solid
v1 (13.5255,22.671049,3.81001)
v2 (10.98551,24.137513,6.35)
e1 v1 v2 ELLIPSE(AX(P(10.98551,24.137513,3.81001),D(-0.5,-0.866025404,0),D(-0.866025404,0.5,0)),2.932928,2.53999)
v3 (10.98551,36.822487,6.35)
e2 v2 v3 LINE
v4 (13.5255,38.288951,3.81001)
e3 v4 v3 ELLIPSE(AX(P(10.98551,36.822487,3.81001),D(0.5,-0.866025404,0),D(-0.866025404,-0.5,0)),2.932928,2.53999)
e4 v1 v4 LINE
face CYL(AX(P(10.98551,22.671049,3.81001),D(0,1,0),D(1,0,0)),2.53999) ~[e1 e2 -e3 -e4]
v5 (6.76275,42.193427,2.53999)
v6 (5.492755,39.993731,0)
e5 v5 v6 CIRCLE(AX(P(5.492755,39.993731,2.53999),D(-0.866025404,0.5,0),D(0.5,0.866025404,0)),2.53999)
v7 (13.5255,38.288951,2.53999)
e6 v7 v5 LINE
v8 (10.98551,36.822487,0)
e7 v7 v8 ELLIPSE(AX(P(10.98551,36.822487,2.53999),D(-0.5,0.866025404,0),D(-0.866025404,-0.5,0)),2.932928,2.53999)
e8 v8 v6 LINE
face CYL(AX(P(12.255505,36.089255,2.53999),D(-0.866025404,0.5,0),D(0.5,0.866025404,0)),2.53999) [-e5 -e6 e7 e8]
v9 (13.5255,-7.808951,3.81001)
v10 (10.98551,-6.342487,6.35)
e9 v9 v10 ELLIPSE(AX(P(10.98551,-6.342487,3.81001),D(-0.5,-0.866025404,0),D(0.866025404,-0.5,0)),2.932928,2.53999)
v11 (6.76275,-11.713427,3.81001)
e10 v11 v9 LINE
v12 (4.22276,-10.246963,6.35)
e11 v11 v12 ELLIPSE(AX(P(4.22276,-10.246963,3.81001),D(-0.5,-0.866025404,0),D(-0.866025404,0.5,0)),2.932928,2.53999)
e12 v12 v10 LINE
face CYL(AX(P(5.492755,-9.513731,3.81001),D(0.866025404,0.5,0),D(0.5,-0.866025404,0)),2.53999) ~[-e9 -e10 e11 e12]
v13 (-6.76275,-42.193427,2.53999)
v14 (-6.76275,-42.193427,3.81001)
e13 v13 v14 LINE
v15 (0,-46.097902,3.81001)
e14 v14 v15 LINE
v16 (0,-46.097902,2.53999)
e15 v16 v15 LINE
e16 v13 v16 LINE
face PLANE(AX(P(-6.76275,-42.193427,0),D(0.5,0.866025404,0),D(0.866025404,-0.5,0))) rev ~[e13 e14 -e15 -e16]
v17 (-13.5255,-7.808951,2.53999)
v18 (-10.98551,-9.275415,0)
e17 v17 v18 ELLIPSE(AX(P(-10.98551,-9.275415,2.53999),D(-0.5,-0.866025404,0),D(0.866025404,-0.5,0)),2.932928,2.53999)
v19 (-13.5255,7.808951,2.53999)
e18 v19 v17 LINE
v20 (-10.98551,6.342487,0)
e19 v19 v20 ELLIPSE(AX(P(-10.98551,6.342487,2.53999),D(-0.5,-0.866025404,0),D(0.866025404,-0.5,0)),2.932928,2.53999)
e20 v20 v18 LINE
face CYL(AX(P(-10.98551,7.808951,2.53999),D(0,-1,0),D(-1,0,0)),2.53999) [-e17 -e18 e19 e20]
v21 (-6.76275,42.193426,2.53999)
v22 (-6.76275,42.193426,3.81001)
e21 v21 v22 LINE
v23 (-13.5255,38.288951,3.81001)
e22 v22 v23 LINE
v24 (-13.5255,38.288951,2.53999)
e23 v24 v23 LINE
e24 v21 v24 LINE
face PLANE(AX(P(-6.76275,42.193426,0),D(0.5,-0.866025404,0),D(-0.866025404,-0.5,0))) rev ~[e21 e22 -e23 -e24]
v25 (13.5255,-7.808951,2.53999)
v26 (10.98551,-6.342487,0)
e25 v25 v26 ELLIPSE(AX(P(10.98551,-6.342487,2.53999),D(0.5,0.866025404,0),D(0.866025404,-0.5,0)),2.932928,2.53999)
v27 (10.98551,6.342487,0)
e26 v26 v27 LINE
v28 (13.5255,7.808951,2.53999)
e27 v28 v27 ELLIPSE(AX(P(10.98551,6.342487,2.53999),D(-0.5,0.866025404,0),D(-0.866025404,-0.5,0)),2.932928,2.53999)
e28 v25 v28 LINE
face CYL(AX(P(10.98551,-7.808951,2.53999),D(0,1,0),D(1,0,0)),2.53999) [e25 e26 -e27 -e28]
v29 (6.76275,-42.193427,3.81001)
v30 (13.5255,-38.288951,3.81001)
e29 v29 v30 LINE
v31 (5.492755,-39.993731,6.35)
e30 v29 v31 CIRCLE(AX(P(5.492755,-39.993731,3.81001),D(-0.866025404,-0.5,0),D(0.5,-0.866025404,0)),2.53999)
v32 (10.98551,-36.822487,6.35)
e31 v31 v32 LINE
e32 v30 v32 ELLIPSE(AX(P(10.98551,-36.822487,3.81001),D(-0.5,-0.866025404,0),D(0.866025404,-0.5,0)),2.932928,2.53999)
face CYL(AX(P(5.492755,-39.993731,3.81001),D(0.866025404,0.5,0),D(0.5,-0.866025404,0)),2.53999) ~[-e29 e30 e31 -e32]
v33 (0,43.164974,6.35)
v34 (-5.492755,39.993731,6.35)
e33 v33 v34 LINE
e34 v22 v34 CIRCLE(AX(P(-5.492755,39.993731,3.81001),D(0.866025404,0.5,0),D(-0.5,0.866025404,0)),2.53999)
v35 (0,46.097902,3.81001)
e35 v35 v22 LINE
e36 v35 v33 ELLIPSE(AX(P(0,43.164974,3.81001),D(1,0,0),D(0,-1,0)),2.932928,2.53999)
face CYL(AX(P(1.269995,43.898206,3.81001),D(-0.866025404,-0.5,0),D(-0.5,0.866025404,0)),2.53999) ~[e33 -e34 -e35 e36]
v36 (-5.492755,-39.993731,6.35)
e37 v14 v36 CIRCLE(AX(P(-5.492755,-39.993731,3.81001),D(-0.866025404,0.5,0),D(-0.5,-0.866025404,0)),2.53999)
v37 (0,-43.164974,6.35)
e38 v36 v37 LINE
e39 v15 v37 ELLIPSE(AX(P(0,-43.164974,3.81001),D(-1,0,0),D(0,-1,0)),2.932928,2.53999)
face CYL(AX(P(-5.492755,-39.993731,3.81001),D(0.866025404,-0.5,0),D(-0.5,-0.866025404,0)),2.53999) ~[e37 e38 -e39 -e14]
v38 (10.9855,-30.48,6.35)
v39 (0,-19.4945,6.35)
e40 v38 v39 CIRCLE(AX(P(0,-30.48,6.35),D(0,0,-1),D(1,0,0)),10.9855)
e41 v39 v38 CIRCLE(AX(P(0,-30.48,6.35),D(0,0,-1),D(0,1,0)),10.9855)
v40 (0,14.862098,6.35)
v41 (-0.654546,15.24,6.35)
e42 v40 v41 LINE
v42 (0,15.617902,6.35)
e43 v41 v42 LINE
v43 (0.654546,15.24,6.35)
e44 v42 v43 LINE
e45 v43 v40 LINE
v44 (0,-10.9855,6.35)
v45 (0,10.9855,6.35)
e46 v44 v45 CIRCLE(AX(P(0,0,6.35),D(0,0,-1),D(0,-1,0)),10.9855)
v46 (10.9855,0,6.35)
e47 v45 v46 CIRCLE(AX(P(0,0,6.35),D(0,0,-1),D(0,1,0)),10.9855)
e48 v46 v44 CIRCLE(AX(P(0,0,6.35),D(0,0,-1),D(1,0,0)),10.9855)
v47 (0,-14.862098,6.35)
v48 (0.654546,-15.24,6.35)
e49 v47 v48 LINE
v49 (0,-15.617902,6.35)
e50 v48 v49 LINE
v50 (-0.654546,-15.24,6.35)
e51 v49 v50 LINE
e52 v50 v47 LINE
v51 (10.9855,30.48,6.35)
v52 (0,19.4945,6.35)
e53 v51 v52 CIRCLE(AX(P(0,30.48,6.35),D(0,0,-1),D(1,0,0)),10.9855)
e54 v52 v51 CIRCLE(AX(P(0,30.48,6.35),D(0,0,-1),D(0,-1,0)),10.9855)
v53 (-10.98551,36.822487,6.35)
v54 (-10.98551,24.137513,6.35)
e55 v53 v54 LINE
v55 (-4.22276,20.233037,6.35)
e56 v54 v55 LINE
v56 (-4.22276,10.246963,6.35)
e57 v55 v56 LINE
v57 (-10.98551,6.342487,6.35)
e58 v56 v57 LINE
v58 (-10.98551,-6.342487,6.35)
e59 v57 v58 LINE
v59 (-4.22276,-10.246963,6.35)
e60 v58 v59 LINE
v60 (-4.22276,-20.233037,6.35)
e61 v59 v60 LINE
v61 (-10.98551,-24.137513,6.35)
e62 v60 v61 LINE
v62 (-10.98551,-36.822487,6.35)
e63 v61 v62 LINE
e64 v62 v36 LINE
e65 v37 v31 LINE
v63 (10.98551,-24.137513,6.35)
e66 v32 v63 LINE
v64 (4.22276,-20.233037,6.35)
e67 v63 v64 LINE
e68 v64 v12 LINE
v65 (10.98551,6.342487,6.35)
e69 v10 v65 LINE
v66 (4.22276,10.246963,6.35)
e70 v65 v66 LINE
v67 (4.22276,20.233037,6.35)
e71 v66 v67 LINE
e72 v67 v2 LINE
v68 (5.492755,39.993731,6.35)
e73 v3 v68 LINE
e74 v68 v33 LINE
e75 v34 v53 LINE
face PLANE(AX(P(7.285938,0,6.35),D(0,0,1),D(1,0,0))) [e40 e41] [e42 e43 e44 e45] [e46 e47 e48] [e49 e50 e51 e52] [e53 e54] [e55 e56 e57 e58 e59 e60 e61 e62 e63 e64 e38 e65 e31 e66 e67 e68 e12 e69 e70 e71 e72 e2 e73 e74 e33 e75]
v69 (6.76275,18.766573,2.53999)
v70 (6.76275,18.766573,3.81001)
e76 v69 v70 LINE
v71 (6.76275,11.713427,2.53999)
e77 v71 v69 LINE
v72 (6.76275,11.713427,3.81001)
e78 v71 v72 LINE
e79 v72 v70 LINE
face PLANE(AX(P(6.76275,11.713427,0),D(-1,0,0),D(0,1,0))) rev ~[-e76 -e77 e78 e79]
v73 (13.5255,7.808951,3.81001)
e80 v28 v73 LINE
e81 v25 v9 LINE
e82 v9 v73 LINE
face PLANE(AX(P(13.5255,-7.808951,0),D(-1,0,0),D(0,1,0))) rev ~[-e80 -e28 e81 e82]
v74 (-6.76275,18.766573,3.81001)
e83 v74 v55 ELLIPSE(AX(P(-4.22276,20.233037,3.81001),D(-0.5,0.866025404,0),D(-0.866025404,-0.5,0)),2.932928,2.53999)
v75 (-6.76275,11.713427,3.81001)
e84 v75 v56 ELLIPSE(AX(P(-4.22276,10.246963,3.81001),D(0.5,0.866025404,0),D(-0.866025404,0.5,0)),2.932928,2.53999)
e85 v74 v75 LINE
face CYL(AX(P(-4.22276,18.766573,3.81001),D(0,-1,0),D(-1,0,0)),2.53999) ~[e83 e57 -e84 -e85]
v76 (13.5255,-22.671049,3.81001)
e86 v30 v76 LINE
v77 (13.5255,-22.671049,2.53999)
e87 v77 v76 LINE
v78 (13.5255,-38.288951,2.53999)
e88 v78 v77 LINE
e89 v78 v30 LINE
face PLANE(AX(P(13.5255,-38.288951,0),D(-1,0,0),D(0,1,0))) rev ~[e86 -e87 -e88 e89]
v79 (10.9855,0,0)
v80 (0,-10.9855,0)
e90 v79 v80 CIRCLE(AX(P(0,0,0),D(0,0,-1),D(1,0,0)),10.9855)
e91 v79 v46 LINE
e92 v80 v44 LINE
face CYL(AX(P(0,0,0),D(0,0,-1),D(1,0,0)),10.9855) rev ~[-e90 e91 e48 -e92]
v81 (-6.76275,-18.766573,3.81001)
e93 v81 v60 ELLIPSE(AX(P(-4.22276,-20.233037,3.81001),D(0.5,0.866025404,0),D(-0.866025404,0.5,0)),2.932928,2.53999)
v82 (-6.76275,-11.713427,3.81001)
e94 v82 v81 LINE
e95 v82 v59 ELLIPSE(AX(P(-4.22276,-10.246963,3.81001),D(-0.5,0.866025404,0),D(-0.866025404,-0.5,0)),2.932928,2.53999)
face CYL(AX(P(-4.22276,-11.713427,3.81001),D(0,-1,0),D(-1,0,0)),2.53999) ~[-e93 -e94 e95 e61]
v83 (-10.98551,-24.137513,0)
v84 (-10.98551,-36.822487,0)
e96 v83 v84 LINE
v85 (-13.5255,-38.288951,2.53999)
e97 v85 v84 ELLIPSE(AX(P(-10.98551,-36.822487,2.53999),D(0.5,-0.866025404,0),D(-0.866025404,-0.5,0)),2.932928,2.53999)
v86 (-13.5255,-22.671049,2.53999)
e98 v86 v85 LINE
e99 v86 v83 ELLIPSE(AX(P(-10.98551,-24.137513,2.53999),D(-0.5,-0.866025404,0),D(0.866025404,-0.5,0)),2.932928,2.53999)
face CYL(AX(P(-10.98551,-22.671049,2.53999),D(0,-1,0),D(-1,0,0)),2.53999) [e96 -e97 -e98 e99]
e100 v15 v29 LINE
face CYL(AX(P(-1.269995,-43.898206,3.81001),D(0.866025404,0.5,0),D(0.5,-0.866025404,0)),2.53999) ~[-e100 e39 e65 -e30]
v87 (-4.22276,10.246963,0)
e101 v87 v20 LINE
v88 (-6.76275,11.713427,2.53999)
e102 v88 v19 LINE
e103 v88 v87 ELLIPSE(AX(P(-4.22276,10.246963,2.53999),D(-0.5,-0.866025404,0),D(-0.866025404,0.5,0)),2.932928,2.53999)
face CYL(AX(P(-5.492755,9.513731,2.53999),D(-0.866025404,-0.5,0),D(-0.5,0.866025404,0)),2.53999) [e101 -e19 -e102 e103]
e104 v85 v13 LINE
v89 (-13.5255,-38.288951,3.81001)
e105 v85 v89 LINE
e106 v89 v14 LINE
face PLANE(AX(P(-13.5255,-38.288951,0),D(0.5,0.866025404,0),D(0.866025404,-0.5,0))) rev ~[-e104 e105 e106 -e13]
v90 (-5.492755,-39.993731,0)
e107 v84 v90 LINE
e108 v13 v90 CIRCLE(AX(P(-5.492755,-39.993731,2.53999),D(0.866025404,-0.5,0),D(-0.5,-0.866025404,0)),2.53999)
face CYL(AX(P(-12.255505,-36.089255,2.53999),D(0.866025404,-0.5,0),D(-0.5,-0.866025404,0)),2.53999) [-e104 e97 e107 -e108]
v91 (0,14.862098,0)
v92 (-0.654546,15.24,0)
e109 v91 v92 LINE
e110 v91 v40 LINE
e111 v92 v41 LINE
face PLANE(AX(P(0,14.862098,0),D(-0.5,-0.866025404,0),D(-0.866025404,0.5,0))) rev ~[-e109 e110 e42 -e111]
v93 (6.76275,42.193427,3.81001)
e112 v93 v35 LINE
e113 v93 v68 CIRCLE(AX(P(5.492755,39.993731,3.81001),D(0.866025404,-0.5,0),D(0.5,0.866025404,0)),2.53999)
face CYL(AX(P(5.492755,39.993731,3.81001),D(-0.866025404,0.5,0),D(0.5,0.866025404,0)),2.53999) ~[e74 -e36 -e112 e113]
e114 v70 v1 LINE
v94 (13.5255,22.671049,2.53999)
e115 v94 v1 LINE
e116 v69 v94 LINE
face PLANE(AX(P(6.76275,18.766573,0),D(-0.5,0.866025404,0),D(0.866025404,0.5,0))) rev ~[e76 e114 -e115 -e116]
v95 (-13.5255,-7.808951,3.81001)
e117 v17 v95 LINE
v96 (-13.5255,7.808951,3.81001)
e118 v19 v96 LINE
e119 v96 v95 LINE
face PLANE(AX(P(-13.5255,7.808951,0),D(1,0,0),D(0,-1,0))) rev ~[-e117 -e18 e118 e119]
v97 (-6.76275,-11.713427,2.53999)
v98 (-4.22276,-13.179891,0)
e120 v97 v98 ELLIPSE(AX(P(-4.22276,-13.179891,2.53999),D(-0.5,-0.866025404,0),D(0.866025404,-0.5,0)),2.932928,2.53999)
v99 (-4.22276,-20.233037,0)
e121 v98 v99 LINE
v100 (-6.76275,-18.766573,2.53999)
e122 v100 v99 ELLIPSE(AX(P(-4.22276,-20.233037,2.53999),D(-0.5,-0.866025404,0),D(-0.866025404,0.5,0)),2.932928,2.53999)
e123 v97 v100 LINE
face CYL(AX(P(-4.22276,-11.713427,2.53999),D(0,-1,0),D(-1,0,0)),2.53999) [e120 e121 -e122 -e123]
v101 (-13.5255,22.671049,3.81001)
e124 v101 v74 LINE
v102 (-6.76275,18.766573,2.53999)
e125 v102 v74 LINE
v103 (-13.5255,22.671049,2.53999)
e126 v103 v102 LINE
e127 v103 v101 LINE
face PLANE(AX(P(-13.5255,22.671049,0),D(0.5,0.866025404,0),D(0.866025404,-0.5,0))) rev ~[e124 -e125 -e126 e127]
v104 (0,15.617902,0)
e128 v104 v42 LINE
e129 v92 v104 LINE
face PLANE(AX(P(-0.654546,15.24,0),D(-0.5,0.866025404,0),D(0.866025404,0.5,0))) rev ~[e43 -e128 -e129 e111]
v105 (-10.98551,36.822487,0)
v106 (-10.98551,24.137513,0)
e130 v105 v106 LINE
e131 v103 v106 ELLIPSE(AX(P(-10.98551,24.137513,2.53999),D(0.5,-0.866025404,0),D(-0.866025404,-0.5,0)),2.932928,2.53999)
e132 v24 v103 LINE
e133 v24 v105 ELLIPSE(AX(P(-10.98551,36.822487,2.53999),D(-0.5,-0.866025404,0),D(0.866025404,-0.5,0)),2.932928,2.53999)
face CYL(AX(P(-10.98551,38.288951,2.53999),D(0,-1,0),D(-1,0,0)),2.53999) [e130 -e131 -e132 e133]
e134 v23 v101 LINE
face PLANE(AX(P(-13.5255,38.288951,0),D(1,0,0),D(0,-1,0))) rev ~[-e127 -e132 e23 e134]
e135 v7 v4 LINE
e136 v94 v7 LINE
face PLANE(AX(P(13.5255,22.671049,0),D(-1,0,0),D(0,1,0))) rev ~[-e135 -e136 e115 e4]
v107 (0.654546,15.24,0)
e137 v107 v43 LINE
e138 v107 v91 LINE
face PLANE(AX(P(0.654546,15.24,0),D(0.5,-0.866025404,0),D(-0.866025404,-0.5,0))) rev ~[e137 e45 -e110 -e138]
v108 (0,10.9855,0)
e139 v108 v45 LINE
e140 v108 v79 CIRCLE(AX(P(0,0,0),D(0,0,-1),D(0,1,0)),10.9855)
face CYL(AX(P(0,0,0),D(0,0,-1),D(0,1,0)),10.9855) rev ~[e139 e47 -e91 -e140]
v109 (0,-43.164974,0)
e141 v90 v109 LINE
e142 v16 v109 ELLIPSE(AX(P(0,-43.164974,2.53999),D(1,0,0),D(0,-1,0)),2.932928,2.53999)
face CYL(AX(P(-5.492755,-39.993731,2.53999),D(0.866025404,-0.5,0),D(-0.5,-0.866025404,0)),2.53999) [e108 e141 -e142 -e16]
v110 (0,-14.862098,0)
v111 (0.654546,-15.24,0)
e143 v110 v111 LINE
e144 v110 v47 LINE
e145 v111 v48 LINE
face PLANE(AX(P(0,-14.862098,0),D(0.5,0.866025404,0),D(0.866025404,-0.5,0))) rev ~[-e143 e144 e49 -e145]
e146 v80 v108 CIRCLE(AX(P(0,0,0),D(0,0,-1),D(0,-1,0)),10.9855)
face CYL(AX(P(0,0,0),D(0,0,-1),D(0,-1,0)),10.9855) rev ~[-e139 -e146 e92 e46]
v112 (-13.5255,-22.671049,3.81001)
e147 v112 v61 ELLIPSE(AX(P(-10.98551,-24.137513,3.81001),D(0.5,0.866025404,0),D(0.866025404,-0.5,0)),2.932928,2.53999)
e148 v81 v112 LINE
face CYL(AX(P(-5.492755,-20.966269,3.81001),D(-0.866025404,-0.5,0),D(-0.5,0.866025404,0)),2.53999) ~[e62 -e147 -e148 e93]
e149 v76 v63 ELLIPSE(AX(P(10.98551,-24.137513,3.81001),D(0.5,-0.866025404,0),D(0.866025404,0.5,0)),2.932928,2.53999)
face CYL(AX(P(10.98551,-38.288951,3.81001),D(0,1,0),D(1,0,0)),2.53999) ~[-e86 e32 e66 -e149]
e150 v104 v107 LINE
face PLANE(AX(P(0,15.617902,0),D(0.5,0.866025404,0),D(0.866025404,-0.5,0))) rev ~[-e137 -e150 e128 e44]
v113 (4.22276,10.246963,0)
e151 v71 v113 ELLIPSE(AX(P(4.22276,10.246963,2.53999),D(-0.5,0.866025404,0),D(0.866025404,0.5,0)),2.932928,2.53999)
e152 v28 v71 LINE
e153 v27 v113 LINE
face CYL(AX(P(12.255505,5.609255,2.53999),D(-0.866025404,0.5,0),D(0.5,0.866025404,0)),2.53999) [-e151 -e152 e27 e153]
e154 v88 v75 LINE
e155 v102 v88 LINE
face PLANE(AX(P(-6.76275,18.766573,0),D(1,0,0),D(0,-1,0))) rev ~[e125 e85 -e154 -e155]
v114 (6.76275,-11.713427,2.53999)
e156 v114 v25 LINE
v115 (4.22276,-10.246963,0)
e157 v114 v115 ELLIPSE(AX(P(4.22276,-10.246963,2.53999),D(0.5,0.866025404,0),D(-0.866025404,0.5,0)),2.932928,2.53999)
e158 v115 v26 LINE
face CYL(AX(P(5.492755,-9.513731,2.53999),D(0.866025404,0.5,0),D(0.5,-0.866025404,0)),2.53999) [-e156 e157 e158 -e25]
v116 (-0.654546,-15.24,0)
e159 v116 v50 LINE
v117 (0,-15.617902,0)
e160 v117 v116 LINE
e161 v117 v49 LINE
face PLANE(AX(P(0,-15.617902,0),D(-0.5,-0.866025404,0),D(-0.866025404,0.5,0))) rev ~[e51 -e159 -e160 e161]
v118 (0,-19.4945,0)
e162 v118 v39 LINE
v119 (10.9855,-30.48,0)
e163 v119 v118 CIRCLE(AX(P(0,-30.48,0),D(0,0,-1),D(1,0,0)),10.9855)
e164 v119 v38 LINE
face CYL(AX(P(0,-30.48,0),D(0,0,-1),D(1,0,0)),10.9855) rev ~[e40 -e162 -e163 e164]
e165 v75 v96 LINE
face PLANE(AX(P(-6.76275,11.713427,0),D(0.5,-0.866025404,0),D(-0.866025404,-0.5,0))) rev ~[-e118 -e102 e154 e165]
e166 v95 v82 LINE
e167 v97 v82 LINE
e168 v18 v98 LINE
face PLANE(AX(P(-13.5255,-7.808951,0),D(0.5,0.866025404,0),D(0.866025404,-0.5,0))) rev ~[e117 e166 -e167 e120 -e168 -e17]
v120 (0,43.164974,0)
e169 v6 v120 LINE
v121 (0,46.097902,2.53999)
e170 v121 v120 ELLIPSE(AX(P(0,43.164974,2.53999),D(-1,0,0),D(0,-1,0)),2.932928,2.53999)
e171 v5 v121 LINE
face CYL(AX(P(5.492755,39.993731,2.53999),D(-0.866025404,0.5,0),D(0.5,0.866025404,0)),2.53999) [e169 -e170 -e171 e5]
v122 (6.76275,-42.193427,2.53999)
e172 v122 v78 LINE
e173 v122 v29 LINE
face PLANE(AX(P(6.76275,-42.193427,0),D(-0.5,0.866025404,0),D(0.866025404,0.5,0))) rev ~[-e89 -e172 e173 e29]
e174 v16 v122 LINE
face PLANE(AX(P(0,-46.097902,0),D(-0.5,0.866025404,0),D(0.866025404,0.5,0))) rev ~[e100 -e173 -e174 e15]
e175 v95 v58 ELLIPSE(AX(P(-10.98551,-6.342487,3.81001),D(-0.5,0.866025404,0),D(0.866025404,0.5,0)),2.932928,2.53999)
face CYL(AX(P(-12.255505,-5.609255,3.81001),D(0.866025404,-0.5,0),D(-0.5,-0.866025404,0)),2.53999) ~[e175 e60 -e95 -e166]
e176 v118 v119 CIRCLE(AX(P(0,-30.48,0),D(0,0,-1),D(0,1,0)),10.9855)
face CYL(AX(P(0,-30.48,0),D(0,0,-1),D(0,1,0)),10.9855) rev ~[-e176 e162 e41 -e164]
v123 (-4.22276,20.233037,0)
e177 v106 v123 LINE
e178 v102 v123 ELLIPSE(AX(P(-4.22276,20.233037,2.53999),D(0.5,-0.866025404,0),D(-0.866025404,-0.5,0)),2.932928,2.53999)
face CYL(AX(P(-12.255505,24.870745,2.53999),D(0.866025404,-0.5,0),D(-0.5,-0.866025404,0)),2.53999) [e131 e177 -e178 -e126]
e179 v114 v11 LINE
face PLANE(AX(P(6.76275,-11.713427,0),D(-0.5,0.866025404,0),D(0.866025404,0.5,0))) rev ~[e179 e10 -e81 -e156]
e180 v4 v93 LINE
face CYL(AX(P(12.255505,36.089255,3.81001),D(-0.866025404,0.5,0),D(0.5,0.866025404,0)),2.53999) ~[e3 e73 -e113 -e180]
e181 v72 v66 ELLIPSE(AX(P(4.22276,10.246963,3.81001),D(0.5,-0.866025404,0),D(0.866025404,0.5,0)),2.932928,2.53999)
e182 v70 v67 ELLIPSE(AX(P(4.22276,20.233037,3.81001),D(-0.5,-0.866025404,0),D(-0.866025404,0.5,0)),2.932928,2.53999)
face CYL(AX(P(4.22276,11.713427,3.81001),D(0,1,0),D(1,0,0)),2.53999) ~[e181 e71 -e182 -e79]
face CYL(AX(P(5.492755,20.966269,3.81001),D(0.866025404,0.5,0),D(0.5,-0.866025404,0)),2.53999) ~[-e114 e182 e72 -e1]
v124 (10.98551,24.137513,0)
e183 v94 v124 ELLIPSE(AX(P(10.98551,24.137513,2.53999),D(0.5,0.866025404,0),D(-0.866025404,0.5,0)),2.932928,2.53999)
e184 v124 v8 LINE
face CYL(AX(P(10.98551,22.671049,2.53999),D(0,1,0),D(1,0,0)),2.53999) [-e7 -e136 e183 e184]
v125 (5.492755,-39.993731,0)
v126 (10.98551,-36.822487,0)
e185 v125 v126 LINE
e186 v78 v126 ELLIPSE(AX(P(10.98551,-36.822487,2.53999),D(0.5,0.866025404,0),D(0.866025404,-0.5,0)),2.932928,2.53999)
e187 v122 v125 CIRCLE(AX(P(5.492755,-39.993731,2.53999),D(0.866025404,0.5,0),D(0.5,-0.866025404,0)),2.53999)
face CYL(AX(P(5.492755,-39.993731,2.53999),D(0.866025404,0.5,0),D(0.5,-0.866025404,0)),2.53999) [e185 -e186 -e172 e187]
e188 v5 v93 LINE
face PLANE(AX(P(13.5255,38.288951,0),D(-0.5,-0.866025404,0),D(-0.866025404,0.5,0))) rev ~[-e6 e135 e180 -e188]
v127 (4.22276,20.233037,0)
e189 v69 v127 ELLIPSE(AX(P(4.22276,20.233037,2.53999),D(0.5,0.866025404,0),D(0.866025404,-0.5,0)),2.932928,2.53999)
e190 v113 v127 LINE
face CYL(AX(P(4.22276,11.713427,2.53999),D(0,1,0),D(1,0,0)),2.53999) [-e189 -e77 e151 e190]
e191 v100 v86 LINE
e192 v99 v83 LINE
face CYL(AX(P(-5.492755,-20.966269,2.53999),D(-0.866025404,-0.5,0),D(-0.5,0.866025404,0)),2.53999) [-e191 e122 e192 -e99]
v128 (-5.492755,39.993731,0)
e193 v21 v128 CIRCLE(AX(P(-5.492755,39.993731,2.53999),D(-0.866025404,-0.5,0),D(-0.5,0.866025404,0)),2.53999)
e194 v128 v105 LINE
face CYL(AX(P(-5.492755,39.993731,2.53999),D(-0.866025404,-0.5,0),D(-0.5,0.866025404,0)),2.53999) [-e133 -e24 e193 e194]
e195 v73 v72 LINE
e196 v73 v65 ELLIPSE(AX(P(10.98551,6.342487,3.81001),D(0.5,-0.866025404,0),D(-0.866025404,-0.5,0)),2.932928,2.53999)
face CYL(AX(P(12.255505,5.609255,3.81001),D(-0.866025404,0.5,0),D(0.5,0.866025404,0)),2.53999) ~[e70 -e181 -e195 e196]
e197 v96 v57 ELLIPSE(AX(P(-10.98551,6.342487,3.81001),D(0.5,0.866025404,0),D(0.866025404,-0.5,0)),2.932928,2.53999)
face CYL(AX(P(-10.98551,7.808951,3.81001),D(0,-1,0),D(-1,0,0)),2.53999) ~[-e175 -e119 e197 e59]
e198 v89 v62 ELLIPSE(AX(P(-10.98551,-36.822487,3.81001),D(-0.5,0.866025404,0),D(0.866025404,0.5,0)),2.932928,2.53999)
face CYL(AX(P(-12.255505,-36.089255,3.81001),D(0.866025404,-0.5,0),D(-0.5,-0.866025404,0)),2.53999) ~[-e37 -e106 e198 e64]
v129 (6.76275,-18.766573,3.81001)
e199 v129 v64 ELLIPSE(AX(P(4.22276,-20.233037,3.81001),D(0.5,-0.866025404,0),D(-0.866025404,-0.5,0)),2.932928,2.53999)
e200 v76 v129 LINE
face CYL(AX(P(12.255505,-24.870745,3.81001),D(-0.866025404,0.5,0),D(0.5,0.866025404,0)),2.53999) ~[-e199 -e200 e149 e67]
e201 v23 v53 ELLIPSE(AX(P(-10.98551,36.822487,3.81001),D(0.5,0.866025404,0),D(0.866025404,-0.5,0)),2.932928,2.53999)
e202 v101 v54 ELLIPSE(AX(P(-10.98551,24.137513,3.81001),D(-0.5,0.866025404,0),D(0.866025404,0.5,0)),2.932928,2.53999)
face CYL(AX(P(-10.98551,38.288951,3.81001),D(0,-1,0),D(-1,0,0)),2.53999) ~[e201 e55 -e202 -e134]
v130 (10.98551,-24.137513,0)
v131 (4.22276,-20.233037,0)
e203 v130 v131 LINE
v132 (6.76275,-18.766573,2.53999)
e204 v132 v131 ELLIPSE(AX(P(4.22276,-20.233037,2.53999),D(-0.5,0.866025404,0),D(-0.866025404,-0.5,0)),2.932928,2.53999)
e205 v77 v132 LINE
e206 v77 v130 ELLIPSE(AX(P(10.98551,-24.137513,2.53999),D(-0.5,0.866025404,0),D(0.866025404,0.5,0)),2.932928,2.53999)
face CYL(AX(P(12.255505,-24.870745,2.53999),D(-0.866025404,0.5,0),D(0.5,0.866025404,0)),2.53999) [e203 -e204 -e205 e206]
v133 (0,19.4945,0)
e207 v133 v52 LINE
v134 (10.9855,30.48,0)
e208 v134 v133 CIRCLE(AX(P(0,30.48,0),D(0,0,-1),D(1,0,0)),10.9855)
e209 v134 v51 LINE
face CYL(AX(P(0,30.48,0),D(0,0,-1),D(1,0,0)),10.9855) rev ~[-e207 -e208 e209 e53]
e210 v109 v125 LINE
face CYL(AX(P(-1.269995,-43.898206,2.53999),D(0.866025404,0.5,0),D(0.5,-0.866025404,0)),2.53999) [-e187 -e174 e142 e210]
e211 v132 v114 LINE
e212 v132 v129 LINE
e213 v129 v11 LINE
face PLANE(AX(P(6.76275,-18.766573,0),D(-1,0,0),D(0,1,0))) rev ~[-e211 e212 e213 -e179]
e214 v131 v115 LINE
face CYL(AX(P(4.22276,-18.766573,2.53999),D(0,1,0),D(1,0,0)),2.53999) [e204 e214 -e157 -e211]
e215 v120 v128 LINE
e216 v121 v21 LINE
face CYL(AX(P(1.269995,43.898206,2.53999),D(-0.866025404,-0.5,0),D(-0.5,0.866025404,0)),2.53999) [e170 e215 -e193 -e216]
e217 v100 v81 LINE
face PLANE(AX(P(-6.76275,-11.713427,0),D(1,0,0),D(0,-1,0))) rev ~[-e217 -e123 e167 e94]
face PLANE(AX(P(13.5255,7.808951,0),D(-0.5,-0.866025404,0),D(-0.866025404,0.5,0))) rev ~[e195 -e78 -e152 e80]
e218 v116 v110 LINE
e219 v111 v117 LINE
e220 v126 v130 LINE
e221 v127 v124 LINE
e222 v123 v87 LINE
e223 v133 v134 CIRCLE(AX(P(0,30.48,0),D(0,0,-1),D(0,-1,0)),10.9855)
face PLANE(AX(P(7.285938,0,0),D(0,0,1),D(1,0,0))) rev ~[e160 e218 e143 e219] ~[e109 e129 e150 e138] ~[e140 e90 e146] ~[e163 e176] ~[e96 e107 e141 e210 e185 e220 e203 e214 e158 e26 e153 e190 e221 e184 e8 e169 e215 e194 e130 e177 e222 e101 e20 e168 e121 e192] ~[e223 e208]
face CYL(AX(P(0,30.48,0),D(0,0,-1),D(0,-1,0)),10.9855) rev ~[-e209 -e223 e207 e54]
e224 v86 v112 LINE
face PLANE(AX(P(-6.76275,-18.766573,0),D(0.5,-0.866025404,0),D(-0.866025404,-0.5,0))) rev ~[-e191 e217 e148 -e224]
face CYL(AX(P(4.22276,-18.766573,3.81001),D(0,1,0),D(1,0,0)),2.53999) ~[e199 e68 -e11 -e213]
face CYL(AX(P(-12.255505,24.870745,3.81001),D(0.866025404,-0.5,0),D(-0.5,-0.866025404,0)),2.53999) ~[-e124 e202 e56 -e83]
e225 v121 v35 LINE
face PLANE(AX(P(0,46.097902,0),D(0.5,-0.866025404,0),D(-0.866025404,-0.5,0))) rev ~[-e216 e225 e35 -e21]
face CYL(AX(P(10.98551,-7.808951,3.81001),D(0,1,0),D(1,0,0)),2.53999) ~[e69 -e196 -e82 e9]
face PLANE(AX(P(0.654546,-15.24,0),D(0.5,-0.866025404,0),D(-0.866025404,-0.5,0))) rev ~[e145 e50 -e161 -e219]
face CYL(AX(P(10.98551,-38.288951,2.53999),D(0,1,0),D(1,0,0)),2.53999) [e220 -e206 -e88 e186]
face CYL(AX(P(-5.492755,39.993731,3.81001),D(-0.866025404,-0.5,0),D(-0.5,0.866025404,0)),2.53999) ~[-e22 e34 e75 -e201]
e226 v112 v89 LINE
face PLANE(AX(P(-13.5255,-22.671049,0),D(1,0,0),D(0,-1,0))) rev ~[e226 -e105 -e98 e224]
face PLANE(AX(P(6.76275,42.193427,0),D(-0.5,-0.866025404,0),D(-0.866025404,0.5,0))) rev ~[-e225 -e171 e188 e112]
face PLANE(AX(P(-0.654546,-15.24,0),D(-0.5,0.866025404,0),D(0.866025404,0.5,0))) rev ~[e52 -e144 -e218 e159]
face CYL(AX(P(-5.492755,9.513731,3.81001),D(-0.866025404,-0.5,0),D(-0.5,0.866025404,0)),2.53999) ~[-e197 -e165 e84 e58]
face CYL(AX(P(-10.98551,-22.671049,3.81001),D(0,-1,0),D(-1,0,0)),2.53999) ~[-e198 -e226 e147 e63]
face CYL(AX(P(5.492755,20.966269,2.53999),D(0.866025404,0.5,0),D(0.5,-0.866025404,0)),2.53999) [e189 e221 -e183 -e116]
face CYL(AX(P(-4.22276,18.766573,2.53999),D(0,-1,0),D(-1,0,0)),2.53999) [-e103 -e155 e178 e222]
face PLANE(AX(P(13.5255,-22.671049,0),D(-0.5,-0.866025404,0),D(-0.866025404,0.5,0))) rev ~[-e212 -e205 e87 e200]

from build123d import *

# Parameters (mm, degrees)
F1_DEPTH = 6.35
F2_R     = 2.53999


# Not quite as in the source:
# - a fillet or chamfer is up to 0.001 mm smaller than in the source, because OpenCascade refuses the exact size


with BuildPart() as f1:
    # F0 (on Top) → F1 (new body)
    with BuildSketch(Plane.XY):
        with BuildLine():
            ThreePointArc((6.76275, -11.7134265989), (11.7134265989, -6.76275), (13.5255, 0))
            ThreePointArc((13.5255, 0), (11.7134265989, 6.76275), (6.76275, 11.7134265989))
            ThreePointArc((6.76275, 11.7134265989), (3.5006569945, 13.0646297635), (0, 13.5255))
            Line((0, 13.5255), (0, 10.9855))
            ThreePointArc((0, 10.9855), (7.7679215447, 7.7679215447), (10.9855, 0))
            ThreePointArc((10.9855, 0), (7.7679215447, -7.7679215447), (0, -10.9855))
            Line((0, -10.9855), (0, -13.5255))
            ThreePointArc((0, -13.5255), (3.5006569945, -13.0646297635), (6.76275, -11.7134265989))
        make_face()
        with BuildLine():
            Line((13.5255, -7.8089510659), (13.5255, 0))
            ThreePointArc((13.5255, 0), (11.7134265989, -6.76275), (6.76275, -11.7134265989))
            Line((6.76275, -11.7134265989), (13.5255, -7.8089510659))
        make_face()
        with BuildLine():
            ThreePointArc((6.76275, 11.7134265989), (11.7134265989, 6.76275), (13.5255, 0))
            Line((13.5255, 0), (13.5255, 7.8089510659))
            Line((13.5255, 7.8089510659), (6.76275, 11.7134265989))
        make_face()
        with BuildLine():
            ThreePointArc((0, 13.5255), (3.5006569945, 13.0646297635), (6.76275, 11.7134265989))
            Line((6.76275, 11.7134265989), (0.6545456927, 15.24))
            Line((0.6545456927, 15.24), (0, 14.8620978682))
            Line((0, 14.8620978682), (0, 13.5255))
        make_face()
        Polygon((0.6545456927, 15.24), (6.76275, 11.7134265989), (6.76275, 18.7665734011), align=None)
        with BuildLine():
            Line((0.6545456927, -15.24), (6.76275, -11.7134265989))
            ThreePointArc((6.76275, -11.7134265989), (3.5006569945, -13.0646297635), (0, -13.5255))
            Line((0, -13.5255), (0, -14.8620978682))
            Line((0, -14.8620978682), (0.6545456927, -15.24))
        make_face()
        Polygon((6.76275, -18.7665734011), (6.76275, -11.7134265989), (0.6545456927, -15.24), align=None)
        with BuildLine():
            Line((0, 10.9855), (0, 13.5255))
            ThreePointArc((0, 13.5255), (-3.5006569945, 13.0646297635), (-6.76275, 11.7134265989))
            ThreePointArc((-6.76275, 11.7134265989), (-11.7134265989, 6.76275), (-13.5255, 0))
            ThreePointArc((-13.5255, 0), (-11.7134265989, -6.76275), (-6.76275, -11.7134265989))
            ThreePointArc((-6.76275, -11.7134265989), (-3.5006569945, -13.0646297635), (0, -13.5255))
            Line((0, -13.5255), (0, -10.9855))
            ThreePointArc((0, -10.9855), (-10.9855, 0), (0, 10.9855))
        make_face()
        with BuildLine():
            ThreePointArc((-6.76275, 11.7134265989), (-3.5006569945, 13.0646297635), (0, 13.5255))
            Line((0, 13.5255), (0, 14.8620978682))
            Line((0, 14.8620978682), (-0.6545456927, 15.24))
            Line((-0.6545456927, 15.24), (-6.76275, 11.7134265989))
        make_face()
        with BuildLine():
            Line((0, 15.6179021318), (0.6545456927, 15.24))
            Line((0.6545456927, 15.24), (6.76275, 18.7665734011))
            ThreePointArc((6.76275, 18.7665734011), (3.5006569945, 17.4153702365), (0, 16.9545))
            Line((0, 16.9545), (0, 15.6179021318))
        make_face()
        with BuildLine():
            ThreePointArc((0, 16.9545), (3.5006569945, 17.4153702365), (6.76275, 18.7665734011))
            ThreePointArc((6.76275, 18.7665734011), (11.7134265989, 23.71725), (13.5255, 30.48))
            ThreePointArc((13.5255, 30.48), (11.7134266013, 37.2427499958), (6.7627500083, 42.1934265941))
            ThreePointArc((6.7627500083, 42.1934265941), (-1.056e-07, 44.0055), (-6.7627501912, 42.1934264885))
            ThreePointArc((-6.7627501912, 42.1934264885), (-11.7134266541, 37.2427499044), (-13.5255, 30.48))
            ThreePointArc((-13.5255, 30.48), (-11.7134265989, 23.71725), (-6.76275, 18.7665734011))
            ThreePointArc((-6.76275, 18.7665734011), (-3.5006569945, 17.4153702365), (0, 16.9545))
        make_face()
        with BuildLine():
            ThreePointArc((10.9855, 30.48), (7.7679215447, 22.7120784553), (0, 19.4945))
            ThreePointArc((0, 19.4945), (-7.7679215447, 38.2479215447), (10.9855, 30.48))
        make_face(mode=Mode.SUBTRACT)
        with BuildLine():
            ThreePointArc((13.5255, 30.48), (11.7134265989, 23.71725), (6.76275, 18.7665734011))
            Line((6.76275, 18.7665734011), (13.5255, 22.6710489341))
            Line((13.5255, 22.6710489341), (13.5255, 30.48))
        make_face()
        with BuildLine():
            Line((0, -14.8620978682), (0, -13.5255))
            ThreePointArc((0, -13.5255), (-3.5006569945, -13.0646297635), (-6.76275, -11.7134265989))
            Line((-6.76275, -11.7134265989), (-0.6545456927, -15.24))
            Line((-0.6545456927, -15.24), (0, -14.8620978682))
        make_face()
        with BuildLine():
            Line((6.76275, -18.7665734011), (0.6545456927, -15.24))
            Line((0.6545456927, -15.24), (0, -15.6179021318))
            Line((0, -15.6179021318), (0, -16.9545))
            ThreePointArc((0, -16.9545), (3.5006569945, -17.4153702365), (6.76275, -18.7665734011))
        make_face()
        with BuildLine():
            Line((13.5255, -22.6710489341), (6.76275, -18.7665734011))
            ThreePointArc((6.76275, -18.7665734011), (11.7134265989, -23.71725), (13.5255, -30.48))
            Line((13.5255, -30.48), (13.5255, -22.6710489341))
        make_face()
        with BuildLine():
            ThreePointArc((13.5255, -30.48), (11.7134265989, -23.71725), (6.76275, -18.7665734011))
            ThreePointArc((6.76275, -18.7665734011), (3.5006569945, -17.4153702365), (0, -16.9545))
            ThreePointArc((0, -16.9545), (-3.5006569945, -17.4153702365), (-6.76275, -18.7665734011))
            ThreePointArc((-6.76275, -18.7665734011), (-11.7134265989, -23.71725), (-13.5255, -30.48))
            ThreePointArc((-13.5255, -30.48), (-11.7134266419, -37.2427499255), (-6.762750149, -42.1934265129))
            ThreePointArc((-6.762750149, -42.1934265129), (-1.97e-07, -44.0055), (6.7627498078, -42.1934267099))
            ThreePointArc((6.7627498078, -42.1934267099), (11.7134265434, -37.2427500961), (13.5255, -30.48))
        make_face()
        with BuildLine():
            ThreePointArc((10.9855, -30.48), (-7.7679215447, -38.2479215447), (0, -19.4945))
            ThreePointArc((0, -19.4945), (7.7679215447, -22.7120784553), (10.9855, -30.48))
        make_face(mode=Mode.SUBTRACT)
        with BuildLine():
            ThreePointArc((-13.5255, 0), (-11.7134265989, 6.76275), (-6.76275, 11.7134265989))
            Line((-6.76275, 11.7134265989), (-13.5255, 7.8089510659))
            Line((-13.5255, 7.8089510659), (-13.5255, 0))
        make_face()
        Polygon((-6.76275, 18.7665734011), (-6.76275, 11.7134265989), (-0.6545456927, 15.24), align=None)
        with BuildLine():
            Line((-0.6545456927, 15.24), (0, 15.6179021318))
            Line((0, 15.6179021318), (0, 16.9545))
            ThreePointArc((0, 16.9545), (-3.5006569945, 17.4153702365), (-6.76275, 18.7665734011))
            Line((-6.76275, 18.7665734011), (-0.6545456927, 15.24))
        make_face()
        with BuildLine():
            ThreePointArc((6.7627500083, 42.1934265941), (11.7134266013, 37.2427499958), (13.5255, 30.48))
            Line((13.5255, 30.48), (13.5255, 38.2889510659))
            Line((13.5255, 38.2889510659), (6.7627500083, 42.1934265941))
        make_face()
        with BuildLine():
            Line((-13.5255, -7.8089510659), (-6.76275, -11.7134265989))
            ThreePointArc((-6.76275, -11.7134265989), (-11.7134265989, -6.76275), (-13.5255, 0))
            Line((-13.5255, 0), (-13.5255, -7.8089510659))
        make_face()
        Polygon((-0.6545456927, -15.24), (-6.76275, -11.7134265989), (-6.76275, -18.7665734011), align=None)
        with BuildLine():
            Line((0, -16.9545), (0, -15.6179021318))
            Line((0, -15.6179021318), (-0.6545456927, -15.24))
            Line((-0.6545456927, -15.24), (-6.76275, -18.7665734011))
            ThreePointArc((-6.76275, -18.7665734011), (-3.5006569945, -17.4153702365), (0, -16.9545))
        make_face()
        with BuildLine():
            Line((13.5255, -38.2889510659), (13.5255, -30.48))
            ThreePointArc((13.5255, -30.48), (11.7134265434, -37.2427500961), (6.7627498078, -42.1934267099))
            Line((6.7627498078, -42.1934267099), (13.5255, -38.2889510659))
        make_face()
        with BuildLine():
            Line((-13.5255, 22.6710489341), (-6.76275, 18.7665734011))
            ThreePointArc((-6.76275, 18.7665734011), (-11.7134265989, 23.71725), (-13.5255, 30.48))
            Line((-13.5255, 30.48), (-13.5255, 22.6710489341))
        make_face()
        with BuildLine():
            ThreePointArc((-6.7627501912, 42.1934264885), (-1.056e-07, 44.0055), (6.7627500083, 42.1934265941))
            Line((6.7627500083, 42.1934265941), (0, 46.0979021318))
            Line((0, 46.0979021318), (-6.7627501912, 42.1934264885))
        make_face()
        with BuildLine():
            ThreePointArc((-13.5255, -30.48), (-11.7134265989, -23.71725), (-6.76275, -18.7665734011))
            Line((-6.76275, -18.7665734011), (-13.5255, -22.6710489341))
            Line((-13.5255, -22.6710489341), (-13.5255, -30.48))
        make_face()
        with BuildLine():
            Line((0, -46.0979021318), (6.7627498078, -42.1934267099))
            ThreePointArc((6.7627498078, -42.1934267099), (-1.97e-07, -44.0055), (-6.762750149, -42.1934265129))
            Line((-6.762750149, -42.1934265129), (0, -46.0979021318))
        make_face()
        with BuildLine():
            Line((-13.5255, 38.2889510659), (-13.5255, 30.48))
            ThreePointArc((-13.5255, 30.48), (-11.7134266541, 37.2427499044), (-6.7627501912, 42.1934264885))
            Line((-6.7627501912, 42.1934264885), (-13.5255, 38.2889510659))
        make_face()
        with BuildLine():
            ThreePointArc((-6.762750149, -42.1934265129), (-11.7134266419, -37.2427499255), (-13.5255, -30.48))
            Line((-13.5255, -30.48), (-13.5255, -38.2889510659))
            Line((-13.5255, -38.2889510659), (-6.762750149, -42.1934265129))
        make_face()
    extrude(amount=F1_DEPTH)

    # F2 (radius 2.54 in the source; OpenCascade refuses exactly that, so slightly less here)
    f2_edges = [f1.edges().sort_by_distance(p)[0] for p in [
        (-6.76275, -42.193427, 6.35),
        (6.76275, -42.193427, 6.35),
        (13.5255, -30.48, 6.35),
        (-13.5255, -30.48, 6.35),
        (-10.144125, -20.718811, 6.35),
        (-6.76275, -15.24, 6.35),
        (10.144125, -20.718811, 6.35),
        (6.76275, -15.24, 6.35),
        (-10.144125, -9.761189, 6.35),
        (-13.5255, 0, 6.35),
        (-10.144125, 9.761189, 6.35),
        (-6.76275, 15.24, 6.35),
        (-10.144125, 20.718811, 6.35),
        (-13.5255, 30.48, 6.35),
        (-6.76275, 42.193427, 6.35),
        (6.76275, 42.193427, 6.35),
        (13.5255, 30.48, 6.35),
        (6.76275, 15.24, 6.35),
        (10.144125, 20.718811, 6.35),
        (10.144125, 9.761189, 6.35),
        (10.144125, -9.761189, 6.35),
        (13.5255, 0, 6.35),
        (-13.5255, -30.48, 0),
        (-6.76275, -42.193427, 0),
        (6.76275, -42.193427, 0),
        (13.5255, -30.48, 0),
        (10.144125, -20.718811, 0),
        (6.76275, -15.24, 0),
        (-10.144125, -20.718811, 0),
        (-6.76275, -15.24, 0),
        (-13.5255, 0, 0),
        (-10.144125, 9.761189, 0),
        (-6.76275, 15.24, 0),
        (-13.5255, 30.48, 0),
        (-6.76275, 42.193427, 0),
        (6.76275, 42.193427, 0),
        (13.5255, 30.48, 0),
        (10.144125, 20.718811, 0),
        (6.76275, 15.24, 0),
        (10.144125, 9.761189, 0),
        (10.144125, -9.761189, 0),
        (13.5255, 0, 0),
        (-10.144125, 20.718811, 0),
    ]]
    fillet(f2_edges, radius=F2_R)


solid = f1.part
